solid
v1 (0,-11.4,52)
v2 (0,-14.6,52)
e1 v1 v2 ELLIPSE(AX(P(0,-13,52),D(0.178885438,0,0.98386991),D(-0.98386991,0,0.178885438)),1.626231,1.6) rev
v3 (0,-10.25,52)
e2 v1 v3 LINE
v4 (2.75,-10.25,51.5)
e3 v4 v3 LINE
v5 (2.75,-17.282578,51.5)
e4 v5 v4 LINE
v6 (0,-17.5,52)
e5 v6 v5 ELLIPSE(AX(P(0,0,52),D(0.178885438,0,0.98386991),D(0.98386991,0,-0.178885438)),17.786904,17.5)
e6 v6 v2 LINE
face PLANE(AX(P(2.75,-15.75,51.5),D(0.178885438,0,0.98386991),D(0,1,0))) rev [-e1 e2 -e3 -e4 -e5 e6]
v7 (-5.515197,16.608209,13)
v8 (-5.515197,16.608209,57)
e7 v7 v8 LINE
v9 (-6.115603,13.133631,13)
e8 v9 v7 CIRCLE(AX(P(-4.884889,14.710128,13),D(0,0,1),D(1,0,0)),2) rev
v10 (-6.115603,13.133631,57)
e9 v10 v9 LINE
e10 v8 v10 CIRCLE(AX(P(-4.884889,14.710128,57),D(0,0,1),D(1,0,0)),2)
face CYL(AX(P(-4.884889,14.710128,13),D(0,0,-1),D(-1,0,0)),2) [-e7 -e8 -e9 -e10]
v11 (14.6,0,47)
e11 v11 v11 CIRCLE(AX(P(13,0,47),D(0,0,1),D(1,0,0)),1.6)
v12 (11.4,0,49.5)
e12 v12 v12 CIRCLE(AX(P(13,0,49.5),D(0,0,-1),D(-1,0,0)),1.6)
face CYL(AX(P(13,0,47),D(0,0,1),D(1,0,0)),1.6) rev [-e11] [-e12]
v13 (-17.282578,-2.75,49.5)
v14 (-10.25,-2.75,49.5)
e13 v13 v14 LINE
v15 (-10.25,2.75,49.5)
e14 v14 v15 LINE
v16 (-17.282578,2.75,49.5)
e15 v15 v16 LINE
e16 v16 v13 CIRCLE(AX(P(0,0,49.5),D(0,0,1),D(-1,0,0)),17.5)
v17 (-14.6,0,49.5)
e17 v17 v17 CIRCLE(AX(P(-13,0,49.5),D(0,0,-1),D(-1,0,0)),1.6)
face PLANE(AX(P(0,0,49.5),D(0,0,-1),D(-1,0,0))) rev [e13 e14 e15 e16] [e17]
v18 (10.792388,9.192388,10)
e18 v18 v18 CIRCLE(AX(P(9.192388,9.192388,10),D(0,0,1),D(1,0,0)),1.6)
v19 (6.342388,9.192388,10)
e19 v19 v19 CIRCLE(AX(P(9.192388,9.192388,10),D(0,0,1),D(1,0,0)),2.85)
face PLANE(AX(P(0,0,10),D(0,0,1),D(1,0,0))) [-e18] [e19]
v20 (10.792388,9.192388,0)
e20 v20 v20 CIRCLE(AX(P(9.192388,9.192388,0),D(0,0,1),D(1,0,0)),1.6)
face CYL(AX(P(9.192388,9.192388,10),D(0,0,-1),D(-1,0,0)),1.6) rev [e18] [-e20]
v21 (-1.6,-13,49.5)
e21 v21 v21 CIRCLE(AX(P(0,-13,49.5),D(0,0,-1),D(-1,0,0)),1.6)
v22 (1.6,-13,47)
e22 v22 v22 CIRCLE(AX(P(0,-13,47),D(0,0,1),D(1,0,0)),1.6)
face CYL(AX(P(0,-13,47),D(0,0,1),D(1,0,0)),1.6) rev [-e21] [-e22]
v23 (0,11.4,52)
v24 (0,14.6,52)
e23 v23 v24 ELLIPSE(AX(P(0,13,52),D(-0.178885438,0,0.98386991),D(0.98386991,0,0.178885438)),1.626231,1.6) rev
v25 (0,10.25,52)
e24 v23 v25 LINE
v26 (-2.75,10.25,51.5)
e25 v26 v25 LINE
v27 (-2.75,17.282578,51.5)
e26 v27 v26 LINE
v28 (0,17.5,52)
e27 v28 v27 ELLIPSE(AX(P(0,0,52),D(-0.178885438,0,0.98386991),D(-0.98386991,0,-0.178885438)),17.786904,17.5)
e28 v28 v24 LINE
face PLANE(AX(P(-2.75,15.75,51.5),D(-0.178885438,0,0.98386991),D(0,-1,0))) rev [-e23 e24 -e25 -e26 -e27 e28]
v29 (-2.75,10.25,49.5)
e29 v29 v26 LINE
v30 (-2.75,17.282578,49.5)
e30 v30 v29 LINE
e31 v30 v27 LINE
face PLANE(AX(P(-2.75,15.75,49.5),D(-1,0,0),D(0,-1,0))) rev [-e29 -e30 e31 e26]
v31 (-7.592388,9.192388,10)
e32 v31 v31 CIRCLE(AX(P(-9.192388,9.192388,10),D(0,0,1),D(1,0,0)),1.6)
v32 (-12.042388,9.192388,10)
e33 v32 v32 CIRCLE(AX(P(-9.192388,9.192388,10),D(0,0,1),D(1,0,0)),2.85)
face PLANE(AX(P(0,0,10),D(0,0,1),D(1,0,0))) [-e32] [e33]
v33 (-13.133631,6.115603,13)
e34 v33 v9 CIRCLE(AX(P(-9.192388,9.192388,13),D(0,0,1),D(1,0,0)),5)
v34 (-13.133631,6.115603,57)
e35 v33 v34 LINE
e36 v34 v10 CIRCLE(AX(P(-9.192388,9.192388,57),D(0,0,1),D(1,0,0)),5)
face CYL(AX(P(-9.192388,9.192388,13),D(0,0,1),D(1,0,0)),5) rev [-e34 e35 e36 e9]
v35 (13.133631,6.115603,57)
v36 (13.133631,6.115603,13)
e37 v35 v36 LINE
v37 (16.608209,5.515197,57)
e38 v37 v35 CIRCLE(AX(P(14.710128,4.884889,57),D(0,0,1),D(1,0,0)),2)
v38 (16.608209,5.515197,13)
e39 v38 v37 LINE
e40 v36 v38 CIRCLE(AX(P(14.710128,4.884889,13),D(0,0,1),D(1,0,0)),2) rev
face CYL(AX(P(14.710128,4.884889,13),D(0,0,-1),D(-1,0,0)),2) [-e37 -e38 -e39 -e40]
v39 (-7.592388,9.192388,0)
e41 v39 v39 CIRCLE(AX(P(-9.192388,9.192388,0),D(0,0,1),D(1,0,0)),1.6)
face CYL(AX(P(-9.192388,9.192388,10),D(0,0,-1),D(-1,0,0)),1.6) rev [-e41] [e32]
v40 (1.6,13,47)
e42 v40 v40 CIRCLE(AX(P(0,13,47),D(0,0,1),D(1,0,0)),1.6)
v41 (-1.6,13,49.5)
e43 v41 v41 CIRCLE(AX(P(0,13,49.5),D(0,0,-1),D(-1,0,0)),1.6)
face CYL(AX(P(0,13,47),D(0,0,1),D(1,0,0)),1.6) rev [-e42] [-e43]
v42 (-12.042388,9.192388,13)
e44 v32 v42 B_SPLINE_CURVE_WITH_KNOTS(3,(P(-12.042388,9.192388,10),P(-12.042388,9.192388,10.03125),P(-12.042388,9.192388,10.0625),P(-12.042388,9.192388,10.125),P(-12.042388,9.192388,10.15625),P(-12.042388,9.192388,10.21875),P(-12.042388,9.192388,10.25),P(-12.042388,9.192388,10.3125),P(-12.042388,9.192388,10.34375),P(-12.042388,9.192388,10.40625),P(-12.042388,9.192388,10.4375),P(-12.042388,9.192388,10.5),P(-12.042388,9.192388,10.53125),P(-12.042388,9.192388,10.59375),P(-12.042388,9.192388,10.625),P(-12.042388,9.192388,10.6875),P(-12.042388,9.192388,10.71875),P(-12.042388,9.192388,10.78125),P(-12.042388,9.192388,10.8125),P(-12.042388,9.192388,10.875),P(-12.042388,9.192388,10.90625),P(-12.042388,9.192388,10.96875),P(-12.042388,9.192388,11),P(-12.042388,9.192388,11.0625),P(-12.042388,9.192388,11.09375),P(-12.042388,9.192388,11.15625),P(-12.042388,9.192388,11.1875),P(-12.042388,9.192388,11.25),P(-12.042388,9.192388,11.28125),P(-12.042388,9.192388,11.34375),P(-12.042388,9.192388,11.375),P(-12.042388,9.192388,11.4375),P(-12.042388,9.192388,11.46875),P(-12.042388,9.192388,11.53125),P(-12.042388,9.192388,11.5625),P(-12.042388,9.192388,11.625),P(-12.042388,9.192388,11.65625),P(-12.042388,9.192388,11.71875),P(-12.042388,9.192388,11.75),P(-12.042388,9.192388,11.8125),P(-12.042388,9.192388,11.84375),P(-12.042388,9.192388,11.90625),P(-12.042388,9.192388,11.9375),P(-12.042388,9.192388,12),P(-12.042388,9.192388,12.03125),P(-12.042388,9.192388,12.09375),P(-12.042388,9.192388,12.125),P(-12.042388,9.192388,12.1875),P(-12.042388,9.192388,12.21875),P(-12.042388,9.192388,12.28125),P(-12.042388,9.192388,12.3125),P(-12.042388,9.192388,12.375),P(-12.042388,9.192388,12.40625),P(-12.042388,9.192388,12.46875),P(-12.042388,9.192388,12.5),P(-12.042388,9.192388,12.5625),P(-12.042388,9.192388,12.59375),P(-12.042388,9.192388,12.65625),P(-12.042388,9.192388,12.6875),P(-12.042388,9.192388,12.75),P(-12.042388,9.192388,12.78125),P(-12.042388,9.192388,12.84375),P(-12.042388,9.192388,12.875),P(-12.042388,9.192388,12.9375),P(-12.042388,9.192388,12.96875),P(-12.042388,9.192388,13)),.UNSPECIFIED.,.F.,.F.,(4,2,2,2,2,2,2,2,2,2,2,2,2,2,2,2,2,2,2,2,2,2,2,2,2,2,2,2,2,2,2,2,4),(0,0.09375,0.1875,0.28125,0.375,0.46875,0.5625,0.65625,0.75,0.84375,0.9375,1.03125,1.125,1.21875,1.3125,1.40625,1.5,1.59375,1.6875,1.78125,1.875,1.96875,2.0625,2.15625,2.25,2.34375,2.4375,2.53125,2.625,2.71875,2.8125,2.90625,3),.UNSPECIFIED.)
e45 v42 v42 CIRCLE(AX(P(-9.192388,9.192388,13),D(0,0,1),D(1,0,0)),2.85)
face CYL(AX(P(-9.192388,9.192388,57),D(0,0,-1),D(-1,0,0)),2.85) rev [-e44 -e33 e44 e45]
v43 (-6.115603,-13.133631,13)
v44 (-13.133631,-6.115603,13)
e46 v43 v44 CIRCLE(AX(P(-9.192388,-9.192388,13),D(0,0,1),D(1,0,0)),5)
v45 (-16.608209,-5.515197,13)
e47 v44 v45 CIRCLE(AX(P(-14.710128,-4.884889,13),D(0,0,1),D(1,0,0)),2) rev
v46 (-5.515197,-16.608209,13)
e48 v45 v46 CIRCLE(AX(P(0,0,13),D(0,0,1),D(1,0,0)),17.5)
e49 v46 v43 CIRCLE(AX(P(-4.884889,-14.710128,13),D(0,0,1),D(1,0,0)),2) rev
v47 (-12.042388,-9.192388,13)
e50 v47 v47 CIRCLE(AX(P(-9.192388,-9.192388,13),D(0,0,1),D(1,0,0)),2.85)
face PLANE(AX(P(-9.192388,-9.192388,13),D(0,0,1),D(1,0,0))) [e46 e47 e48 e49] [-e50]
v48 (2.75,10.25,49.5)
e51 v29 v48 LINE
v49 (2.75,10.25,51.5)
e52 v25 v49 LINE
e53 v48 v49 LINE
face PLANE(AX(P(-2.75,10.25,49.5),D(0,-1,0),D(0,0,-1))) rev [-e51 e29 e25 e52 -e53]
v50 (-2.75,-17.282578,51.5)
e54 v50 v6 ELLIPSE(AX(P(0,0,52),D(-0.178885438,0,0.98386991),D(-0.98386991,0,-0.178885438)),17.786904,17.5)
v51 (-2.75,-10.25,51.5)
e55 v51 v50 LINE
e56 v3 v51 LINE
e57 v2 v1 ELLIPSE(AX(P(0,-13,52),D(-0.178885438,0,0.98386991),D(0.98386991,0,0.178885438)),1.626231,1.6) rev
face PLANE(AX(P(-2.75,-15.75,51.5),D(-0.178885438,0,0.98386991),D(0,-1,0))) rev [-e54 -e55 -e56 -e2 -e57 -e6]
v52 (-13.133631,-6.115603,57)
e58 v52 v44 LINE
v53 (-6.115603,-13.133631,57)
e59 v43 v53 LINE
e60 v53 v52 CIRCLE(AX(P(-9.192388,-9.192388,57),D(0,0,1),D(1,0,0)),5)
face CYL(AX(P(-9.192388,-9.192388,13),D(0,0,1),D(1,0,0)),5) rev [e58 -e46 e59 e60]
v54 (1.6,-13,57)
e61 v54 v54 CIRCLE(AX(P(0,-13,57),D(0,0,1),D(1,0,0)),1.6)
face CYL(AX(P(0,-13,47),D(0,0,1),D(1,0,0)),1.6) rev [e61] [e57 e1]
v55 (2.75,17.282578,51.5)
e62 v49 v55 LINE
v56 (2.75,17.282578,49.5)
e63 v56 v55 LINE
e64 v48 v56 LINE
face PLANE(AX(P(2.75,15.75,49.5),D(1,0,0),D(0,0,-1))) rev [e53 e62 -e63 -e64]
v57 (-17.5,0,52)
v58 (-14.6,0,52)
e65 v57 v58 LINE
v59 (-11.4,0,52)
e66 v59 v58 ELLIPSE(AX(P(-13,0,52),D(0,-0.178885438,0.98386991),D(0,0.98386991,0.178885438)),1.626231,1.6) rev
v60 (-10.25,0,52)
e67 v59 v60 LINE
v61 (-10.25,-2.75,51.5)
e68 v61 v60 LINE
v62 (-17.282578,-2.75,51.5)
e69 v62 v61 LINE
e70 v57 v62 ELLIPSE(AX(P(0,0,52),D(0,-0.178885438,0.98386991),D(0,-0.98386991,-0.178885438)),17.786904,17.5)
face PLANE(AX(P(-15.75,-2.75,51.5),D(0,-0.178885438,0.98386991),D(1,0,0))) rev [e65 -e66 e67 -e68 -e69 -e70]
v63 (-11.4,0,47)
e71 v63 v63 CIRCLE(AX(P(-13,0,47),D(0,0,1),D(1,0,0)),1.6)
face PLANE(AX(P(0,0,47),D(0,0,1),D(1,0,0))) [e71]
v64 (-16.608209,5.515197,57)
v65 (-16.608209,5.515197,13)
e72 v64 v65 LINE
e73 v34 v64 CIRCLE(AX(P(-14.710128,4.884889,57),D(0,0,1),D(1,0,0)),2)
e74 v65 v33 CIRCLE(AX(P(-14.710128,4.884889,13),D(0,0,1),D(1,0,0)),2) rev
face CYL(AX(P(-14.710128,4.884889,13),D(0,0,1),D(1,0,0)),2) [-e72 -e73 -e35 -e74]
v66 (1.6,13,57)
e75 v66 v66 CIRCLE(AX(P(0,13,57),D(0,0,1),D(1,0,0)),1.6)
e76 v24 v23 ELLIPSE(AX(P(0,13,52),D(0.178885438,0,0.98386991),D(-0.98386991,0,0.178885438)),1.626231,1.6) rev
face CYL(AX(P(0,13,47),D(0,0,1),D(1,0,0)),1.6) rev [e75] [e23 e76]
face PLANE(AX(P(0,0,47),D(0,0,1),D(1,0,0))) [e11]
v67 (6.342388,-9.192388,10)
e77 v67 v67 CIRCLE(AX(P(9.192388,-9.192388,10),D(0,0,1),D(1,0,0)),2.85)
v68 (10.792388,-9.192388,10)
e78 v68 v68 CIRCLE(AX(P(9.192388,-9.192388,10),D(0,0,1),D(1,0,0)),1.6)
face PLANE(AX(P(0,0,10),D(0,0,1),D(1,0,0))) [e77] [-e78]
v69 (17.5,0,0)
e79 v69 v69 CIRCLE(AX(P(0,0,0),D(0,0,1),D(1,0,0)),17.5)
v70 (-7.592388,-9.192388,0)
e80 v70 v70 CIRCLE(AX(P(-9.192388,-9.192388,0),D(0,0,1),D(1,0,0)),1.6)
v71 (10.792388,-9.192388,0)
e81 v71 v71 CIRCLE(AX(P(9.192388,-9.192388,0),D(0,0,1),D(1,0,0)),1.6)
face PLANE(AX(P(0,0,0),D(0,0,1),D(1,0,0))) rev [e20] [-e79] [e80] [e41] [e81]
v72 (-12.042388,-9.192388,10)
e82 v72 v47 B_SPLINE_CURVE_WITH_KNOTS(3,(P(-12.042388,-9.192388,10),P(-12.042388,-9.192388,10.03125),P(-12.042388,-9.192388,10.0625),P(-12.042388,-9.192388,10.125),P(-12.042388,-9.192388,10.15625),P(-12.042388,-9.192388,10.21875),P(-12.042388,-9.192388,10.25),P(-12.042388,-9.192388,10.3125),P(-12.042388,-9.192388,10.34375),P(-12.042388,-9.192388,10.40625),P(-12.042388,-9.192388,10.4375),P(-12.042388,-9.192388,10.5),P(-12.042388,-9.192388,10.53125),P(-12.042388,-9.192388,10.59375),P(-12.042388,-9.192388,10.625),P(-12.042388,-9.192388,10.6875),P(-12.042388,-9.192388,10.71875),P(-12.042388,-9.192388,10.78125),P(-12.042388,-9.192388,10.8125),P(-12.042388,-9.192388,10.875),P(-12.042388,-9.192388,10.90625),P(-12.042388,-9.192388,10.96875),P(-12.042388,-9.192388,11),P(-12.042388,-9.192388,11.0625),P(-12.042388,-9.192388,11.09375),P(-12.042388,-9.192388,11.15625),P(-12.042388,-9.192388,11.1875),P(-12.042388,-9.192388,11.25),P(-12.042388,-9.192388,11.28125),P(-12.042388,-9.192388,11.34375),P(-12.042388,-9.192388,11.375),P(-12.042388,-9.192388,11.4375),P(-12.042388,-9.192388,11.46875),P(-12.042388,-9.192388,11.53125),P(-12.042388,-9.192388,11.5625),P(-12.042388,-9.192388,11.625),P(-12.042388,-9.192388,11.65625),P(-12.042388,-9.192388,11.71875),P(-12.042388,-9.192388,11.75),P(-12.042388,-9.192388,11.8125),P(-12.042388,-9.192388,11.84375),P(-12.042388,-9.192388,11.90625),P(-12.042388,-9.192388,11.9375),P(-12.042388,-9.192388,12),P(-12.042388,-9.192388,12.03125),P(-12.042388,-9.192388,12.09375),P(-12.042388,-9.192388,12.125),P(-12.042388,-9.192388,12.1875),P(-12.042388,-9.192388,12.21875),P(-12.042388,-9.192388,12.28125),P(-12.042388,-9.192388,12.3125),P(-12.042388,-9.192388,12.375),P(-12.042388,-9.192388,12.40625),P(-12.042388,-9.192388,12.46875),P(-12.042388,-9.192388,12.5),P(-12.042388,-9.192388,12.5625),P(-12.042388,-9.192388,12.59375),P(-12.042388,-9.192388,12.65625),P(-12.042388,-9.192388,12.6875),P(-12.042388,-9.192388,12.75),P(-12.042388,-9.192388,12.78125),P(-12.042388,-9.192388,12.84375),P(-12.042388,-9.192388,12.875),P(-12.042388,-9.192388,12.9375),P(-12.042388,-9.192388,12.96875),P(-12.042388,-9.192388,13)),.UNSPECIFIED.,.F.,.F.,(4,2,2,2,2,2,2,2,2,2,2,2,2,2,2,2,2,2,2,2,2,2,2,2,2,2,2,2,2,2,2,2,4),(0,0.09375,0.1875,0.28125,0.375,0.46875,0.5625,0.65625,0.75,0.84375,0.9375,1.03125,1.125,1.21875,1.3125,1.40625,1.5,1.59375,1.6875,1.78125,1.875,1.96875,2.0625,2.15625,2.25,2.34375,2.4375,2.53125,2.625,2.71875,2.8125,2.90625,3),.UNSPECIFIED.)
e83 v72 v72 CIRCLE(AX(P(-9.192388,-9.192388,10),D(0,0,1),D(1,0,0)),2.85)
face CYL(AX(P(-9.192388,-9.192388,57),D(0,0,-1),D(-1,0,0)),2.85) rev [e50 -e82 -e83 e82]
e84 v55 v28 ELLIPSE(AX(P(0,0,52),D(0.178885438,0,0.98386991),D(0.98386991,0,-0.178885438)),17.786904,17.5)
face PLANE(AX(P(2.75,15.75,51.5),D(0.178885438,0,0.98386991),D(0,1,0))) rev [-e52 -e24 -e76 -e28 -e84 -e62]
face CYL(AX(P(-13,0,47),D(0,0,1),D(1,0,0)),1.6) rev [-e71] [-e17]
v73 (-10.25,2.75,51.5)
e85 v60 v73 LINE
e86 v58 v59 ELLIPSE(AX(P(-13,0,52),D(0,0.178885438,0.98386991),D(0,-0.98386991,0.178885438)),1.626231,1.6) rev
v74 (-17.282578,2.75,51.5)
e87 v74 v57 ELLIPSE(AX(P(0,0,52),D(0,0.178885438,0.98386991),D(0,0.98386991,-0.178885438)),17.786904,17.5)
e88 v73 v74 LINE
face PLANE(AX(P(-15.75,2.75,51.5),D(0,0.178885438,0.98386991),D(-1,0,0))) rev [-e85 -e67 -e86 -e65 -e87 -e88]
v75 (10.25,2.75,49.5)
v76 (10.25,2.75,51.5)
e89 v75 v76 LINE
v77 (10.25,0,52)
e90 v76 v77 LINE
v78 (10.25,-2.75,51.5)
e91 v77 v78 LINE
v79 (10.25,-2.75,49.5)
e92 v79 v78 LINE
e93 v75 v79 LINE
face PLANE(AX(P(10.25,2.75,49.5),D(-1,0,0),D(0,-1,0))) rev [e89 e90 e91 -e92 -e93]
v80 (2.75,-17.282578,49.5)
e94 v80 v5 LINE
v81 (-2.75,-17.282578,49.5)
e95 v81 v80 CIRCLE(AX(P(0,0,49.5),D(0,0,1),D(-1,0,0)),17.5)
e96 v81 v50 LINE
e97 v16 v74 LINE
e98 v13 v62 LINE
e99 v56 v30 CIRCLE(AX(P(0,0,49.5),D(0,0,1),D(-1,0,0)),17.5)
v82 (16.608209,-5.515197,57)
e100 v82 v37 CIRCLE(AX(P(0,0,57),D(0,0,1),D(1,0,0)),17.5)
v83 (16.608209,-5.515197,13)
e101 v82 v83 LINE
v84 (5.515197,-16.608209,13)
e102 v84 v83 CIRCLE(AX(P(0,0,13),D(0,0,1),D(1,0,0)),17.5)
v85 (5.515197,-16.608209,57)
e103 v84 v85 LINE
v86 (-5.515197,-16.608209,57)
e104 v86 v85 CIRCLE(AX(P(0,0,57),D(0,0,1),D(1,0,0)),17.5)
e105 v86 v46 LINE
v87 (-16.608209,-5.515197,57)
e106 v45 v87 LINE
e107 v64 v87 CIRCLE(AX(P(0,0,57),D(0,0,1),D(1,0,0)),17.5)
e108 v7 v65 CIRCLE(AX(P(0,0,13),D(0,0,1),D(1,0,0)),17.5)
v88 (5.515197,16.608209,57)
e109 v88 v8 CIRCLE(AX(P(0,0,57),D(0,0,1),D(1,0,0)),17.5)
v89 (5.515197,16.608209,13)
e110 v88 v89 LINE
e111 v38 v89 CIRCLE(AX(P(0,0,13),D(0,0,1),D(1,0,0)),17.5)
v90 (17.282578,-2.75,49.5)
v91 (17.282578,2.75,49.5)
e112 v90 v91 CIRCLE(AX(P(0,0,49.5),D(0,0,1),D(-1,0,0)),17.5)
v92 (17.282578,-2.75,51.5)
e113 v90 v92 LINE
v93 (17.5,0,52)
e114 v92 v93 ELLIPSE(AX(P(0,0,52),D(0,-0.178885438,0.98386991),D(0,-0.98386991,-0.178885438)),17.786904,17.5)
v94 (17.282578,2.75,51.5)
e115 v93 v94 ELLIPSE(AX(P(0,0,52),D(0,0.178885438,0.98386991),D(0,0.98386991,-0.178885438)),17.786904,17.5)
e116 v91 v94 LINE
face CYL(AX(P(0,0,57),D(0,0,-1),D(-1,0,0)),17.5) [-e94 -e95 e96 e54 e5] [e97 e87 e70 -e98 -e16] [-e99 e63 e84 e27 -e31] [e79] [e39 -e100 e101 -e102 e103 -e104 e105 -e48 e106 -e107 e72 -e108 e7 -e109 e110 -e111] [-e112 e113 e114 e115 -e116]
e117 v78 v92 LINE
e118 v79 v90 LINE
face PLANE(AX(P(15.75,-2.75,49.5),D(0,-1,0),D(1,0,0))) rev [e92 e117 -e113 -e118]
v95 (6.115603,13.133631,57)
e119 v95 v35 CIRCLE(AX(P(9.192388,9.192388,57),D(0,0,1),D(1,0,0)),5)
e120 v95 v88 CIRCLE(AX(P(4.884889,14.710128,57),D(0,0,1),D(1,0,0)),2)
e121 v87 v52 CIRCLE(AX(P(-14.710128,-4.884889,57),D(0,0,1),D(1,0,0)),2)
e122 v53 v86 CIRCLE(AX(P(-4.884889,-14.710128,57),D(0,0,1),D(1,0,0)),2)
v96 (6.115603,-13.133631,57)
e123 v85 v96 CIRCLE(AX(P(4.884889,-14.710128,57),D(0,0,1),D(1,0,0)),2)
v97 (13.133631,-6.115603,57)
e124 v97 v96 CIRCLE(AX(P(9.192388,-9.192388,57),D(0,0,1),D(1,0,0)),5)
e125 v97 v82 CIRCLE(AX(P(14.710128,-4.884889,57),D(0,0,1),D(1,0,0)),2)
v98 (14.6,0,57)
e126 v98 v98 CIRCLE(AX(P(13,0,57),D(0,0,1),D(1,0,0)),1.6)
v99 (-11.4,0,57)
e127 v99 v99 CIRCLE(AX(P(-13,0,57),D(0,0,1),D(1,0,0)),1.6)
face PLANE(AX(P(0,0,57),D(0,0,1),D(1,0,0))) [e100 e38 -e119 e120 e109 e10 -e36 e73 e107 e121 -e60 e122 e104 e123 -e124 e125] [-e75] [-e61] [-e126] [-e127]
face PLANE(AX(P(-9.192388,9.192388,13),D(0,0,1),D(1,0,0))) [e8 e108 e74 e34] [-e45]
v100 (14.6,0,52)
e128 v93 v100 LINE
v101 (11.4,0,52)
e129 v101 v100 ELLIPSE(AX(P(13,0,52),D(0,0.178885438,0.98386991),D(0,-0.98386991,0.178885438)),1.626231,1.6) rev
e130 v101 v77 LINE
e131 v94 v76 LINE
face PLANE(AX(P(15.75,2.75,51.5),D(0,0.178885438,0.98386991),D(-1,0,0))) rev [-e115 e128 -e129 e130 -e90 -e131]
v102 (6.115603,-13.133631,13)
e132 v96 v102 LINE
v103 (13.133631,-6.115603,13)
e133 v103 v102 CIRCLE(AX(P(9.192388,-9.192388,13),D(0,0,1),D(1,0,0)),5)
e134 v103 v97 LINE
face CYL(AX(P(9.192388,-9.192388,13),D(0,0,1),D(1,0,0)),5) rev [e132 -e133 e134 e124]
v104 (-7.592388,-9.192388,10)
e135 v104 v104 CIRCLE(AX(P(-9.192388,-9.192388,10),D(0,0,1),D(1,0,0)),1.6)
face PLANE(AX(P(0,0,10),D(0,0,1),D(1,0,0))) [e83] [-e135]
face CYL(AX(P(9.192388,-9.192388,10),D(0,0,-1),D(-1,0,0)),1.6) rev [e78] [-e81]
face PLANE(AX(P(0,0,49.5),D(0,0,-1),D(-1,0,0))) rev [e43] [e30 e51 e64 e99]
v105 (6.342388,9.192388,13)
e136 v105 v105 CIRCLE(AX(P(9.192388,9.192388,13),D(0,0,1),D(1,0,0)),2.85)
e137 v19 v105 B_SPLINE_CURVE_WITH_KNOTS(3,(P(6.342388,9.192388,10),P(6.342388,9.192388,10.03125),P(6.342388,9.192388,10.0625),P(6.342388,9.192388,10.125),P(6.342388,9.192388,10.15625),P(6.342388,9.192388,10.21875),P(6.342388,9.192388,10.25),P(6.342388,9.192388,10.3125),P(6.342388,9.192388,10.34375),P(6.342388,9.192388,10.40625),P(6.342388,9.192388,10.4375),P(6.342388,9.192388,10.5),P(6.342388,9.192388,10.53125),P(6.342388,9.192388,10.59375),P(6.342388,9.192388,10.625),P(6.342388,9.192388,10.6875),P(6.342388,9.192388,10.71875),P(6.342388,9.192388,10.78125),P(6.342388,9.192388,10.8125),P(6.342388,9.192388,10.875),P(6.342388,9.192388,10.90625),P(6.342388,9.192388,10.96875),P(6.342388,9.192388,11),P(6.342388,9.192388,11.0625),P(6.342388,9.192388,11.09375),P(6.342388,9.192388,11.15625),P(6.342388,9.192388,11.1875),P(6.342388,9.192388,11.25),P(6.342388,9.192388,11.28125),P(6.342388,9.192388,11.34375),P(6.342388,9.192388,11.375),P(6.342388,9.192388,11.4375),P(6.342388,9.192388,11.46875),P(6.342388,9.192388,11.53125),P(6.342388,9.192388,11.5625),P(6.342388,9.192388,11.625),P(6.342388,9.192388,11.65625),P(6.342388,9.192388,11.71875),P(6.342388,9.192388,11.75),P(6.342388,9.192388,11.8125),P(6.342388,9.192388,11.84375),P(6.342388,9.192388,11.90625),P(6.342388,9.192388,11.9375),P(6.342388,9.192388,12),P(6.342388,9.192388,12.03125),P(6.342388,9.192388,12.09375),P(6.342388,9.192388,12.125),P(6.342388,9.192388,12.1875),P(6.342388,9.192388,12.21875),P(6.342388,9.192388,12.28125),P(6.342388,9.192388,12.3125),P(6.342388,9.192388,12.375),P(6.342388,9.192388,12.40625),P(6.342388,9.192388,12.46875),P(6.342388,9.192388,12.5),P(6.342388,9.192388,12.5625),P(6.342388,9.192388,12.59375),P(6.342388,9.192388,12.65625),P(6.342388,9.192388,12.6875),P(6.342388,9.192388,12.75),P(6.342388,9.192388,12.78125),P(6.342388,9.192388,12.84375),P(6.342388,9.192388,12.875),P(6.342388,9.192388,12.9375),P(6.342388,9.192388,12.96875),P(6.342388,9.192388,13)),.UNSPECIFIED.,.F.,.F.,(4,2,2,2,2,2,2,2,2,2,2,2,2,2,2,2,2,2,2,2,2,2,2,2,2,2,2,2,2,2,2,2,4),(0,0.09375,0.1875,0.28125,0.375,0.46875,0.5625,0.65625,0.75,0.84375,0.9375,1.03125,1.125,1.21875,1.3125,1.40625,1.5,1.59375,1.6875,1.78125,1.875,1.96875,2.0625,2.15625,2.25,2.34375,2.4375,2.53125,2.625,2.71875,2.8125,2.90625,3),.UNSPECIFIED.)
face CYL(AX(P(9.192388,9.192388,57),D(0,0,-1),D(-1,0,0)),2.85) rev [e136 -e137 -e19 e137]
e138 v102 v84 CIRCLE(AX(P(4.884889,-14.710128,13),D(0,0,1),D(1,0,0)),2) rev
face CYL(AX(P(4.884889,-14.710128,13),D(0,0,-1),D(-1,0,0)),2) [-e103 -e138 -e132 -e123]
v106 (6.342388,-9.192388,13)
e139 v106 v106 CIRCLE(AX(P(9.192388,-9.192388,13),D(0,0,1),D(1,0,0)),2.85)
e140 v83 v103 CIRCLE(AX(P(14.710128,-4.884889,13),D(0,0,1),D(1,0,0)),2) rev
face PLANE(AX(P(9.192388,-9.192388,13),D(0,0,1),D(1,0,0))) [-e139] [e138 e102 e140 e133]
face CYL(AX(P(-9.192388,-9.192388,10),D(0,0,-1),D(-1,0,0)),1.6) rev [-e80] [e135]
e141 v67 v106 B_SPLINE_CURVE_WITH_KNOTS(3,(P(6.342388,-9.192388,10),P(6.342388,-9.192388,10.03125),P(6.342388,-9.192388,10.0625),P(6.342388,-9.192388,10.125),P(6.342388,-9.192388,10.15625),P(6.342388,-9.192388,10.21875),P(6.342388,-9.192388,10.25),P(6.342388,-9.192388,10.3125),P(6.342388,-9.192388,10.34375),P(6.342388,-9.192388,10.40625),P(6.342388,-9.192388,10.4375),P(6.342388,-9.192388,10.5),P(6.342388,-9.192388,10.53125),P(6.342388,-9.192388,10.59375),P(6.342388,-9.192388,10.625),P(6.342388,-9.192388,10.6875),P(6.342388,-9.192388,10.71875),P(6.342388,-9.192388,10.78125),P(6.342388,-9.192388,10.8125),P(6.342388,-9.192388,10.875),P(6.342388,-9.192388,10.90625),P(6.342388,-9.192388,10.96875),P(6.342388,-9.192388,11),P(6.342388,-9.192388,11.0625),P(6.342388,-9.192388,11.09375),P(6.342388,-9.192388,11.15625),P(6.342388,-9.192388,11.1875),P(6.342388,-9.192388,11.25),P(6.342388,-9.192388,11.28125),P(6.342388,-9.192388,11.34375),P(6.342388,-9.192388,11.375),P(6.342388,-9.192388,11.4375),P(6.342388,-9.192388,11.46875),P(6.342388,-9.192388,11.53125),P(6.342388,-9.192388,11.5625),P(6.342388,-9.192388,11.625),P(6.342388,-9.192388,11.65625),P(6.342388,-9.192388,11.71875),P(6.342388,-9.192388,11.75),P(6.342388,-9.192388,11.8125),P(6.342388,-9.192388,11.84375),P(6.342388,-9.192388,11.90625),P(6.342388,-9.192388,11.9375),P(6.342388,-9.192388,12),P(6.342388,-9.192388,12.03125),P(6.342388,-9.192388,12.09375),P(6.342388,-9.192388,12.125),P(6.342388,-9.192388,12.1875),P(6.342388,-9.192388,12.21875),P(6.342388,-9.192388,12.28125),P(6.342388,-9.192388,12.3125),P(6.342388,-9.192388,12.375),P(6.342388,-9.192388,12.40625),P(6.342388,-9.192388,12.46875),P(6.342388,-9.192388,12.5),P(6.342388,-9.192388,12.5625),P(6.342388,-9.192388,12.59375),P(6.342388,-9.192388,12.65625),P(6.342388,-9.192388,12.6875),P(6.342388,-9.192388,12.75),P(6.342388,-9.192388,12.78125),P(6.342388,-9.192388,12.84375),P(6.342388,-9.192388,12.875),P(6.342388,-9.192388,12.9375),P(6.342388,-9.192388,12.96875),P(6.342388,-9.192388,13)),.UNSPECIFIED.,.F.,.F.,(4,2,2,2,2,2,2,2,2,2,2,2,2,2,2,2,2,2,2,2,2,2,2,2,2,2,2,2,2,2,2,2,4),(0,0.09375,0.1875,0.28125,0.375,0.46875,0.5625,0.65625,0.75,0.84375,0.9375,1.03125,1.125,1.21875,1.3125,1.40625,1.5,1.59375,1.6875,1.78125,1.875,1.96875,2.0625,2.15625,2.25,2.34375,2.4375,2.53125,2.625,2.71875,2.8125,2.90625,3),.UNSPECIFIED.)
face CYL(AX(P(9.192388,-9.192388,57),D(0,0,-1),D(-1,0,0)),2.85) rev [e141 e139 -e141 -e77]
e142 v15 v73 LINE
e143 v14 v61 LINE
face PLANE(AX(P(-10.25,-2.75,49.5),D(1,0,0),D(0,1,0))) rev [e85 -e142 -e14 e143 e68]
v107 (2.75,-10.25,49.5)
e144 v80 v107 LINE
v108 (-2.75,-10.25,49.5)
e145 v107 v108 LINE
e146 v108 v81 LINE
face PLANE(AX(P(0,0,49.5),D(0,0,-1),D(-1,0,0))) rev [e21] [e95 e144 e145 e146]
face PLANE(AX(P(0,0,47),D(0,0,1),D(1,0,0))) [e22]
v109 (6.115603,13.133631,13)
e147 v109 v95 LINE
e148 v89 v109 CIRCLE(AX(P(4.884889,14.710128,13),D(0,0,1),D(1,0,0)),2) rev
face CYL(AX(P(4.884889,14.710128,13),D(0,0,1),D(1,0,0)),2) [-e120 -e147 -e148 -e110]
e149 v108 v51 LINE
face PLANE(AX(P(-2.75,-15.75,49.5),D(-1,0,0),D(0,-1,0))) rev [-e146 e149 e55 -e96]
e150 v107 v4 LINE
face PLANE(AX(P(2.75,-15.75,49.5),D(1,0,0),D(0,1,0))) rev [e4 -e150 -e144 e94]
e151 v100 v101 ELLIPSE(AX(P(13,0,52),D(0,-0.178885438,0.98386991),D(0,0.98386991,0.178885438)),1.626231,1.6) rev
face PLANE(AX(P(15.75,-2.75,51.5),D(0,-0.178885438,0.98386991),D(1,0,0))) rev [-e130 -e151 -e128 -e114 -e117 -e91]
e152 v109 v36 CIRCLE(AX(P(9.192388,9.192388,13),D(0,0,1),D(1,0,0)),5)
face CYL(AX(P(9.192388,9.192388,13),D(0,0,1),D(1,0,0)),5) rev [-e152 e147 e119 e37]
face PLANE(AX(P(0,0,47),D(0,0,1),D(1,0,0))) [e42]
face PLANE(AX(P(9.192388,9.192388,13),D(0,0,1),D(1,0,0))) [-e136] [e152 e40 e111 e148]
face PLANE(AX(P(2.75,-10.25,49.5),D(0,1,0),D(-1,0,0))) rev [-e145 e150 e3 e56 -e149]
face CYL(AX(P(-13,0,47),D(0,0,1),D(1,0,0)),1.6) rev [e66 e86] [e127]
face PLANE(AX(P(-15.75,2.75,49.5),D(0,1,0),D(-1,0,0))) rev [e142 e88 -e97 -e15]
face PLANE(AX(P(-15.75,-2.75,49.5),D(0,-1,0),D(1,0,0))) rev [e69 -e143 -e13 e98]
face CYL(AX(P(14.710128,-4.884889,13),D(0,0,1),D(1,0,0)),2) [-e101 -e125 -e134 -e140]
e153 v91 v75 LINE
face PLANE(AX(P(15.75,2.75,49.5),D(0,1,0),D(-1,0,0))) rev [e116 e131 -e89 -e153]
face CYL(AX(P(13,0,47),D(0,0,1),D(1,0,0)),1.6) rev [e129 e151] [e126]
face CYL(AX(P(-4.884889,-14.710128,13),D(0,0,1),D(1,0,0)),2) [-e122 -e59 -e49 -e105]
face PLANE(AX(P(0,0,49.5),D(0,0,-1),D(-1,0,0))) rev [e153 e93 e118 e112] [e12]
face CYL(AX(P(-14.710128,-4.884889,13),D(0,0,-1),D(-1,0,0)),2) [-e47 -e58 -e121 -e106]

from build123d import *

# Parameters (mm, degrees)
SKETCH1_R           = 17.5
SKETCH1_R_2         = 2.85
BOSS_EXTRUDE1_DEPTH = 57
SKETCH1_3_R         = 2.85
SKETCH1_3_R_2       = 1.6
BOSS_EXTRUDE2_DEPTH = 10
SKETCH2_R           = 5
CUT_EXTRUDE1_DEPTH  = 44
FILLET1_R           = 2
CUT_EXTRUDE2_START  = -7.5
SKETCH3_R           = 1.6
CUT_EXTRUDE2_DEPTH  = 2.5
CUT_EXTRUDE3_START  = -10
SKETCH3_2_R         = 1.6
CUT_EXTRUDE3_DEPTH  = 10
CHAMFER1_SIZE       = 2.75
CHAMFER1_SIZE_2     = 0.5


with BuildPart() as part:
    # Sketch1 → Boss-Extrude1 (new body)
    with BuildSketch(Plane(origin=(0, 0, 0), x_dir=(0, 1, 0), z_dir=(0, 0, 1))):
        with Locations(Location((0, 0, 0), (0, 0, 90))):
            Circle(SKETCH1_R)
        with Locations(Location((-9.192388155, 9.192388155, 0), (0, 0, 90))):
            Circle(SKETCH1_R_2, mode=Mode.SUBTRACT)
        with Locations(Location((-9.192388155, -9.192388155, 0), (0, 0, 90))):
            Circle(SKETCH1_R_2, mode=Mode.SUBTRACT)
        with Locations(Location((9.192388155, -9.192388155, 0), (0, 0, 90))):
            Circle(SKETCH1_R_2, mode=Mode.SUBTRACT)
        with Locations(Location((9.192388155, 9.192388155, 0), (0, 0, 90))):
            Circle(SKETCH1_R_2, mode=Mode.SUBTRACT)
    extrude(amount=BOSS_EXTRUDE1_DEPTH)

    # Sketch1<3> → Boss-Extrude2 (add)
    # profile 1 of 4: a face of its own
    with BuildSketch(Plane(origin=(0, 0, 0), x_dir=(0, 1, 0), z_dir=(0, 0, 1))):
        with Locations(Location((-9.192388155, -9.192388155, 0), (0, 0, 90))):
            Circle(SKETCH1_3_R)
        with Locations(Location((-9.192388155, -9.192388155, 0), (0, 0, 270))):
            Circle(SKETCH1_3_R_2, mode=Mode.SUBTRACT)
    # profile 2 of 4: a face of its own
    with BuildSketch(Plane(origin=(0, 0, 0), x_dir=(0, 1, 0), z_dir=(0, 0, 1))):
        with Locations(Location((-9.192388155, 9.192388155, 0), (0, 0, 90))):
            Circle(SKETCH1_3_R)
        with Locations(Location((-9.192388155, 9.192388155, 0), (0, 0, 270))):
            Circle(SKETCH1_3_R_2, mode=Mode.SUBTRACT)
    # profile 3 of 4: a face of its own
    with BuildSketch(Plane(origin=(0, 0, 0), x_dir=(0, 1, 0), z_dir=(0, 0, 1))):
        with Locations(Location((9.192388155, -9.192388155, 0), (0, 0, 90))):
            Circle(SKETCH1_3_R)
        with Locations(Location((9.192388155, -9.192388155, 0), (0, 0, 270))):
            Circle(SKETCH1_3_R_2, mode=Mode.SUBTRACT)
    # profile 4 of 4: a face of its own
    with BuildSketch(Plane(origin=(0, 0, 0), x_dir=(0, 1, 0), z_dir=(0, 0, 1))):
        with Locations(Location((9.192388155, 9.192388155, 0), (0, 0, 90))):
            Circle(SKETCH1_3_R)
        with Locations(Location((9.192388155, 9.192388155, 0), (0, 0, 270))):
            Circle(SKETCH1_3_R_2, mode=Mode.SUBTRACT)
    extrude(amount=BOSS_EXTRUDE2_DEPTH)

    # Sketch2 → Cut-Extrude1 (cut)
    with BuildSketch(Plane.XY.offset(57)):
        with Locations((-9.192388155, 9.192388155)):
            Circle(SKETCH2_R)
        with Locations((9.192388155, 9.192388155)):
            Circle(SKETCH2_R)
        with Locations((9.192388155, -9.192388155)):
            Circle(SKETCH2_R)
        with Locations((-9.192388155, -9.192388155)):
            Circle(SKETCH2_R)
    extrude(amount=-CUT_EXTRUDE1_DEPTH, mode=Mode.SUBTRACT)

    # Fillet1
    fillet1_edges = [part.edges().sort_by_distance(p)[0] for p in [
        (-14.028560913, -10.46181049, 35),
        (-10.46181049, -14.028560913, 35),
        (10.46181049, -14.028560913, 35),
        (14.028560913, -10.46181049, 35),
        (14.028560913, 10.46181049, 35),
        (10.46181049, 14.028560913, 35),
        (-10.46181049, 14.028560913, 35),
        (-14.028560913, 10.46181049, 35),
    ]]
    fillet(fillet1_edges, radius=FILLET1_R)

    # Sketch3 → Cut-Extrude2 (cut)
    # profile 1 of 4: a face of its own
    with BuildSketch(Plane.XY.offset(57).offset(CUT_EXTRUDE2_START)):
        with BuildLine():
            Line((-2.75, 15.75), (-2.75, 17.282577933))
            ThreePointArc((-2.75, 17.282577933), (0, 17.5), (2.75, 17.282577933))
            Line((2.75, 17.282577933), (2.75, 15.75))
            Line((2.75, 15.75), (2.75, 10.25))
            Line((2.75, 10.25), (-2.75, 10.25))
            Line((-2.75, 10.25), (-2.75, 15.75))
        make_face()
        with Locations((0, 13)):
            Circle(SKETCH3_R, mode=Mode.SUBTRACT)
    # profile 2 of 4: a face of its own
    with BuildSketch(Plane.XY.offset(57).offset(CUT_EXTRUDE2_START)):
        with BuildLine():
            Line((15.75, -2.75), (10.25, -2.75))
            Line((10.25, -2.75), (10.25, 2.75))
            Line((10.25, 2.75), (15.75, 2.75))
            Line((15.75, 2.75), (17.282577933, 2.75))
            ThreePointArc((17.282577933, 2.75), (17.5, 0), (17.282577933, -2.75))
            Line((17.282577933, -2.75), (15.75, -2.75))
        make_face()
        with Locations((13, 0)):
            Circle(SKETCH3_R, mode=Mode.SUBTRACT)
    # profile 3 of 4: a face of its own
    with BuildSketch(Plane.XY.offset(57).offset(CUT_EXTRUDE2_START)):
        with BuildLine():
            Line((-2.75, -15.75), (-2.75, -10.25))
            Line((-2.75, -10.25), (2.75, -10.25))
            Line((2.75, -10.25), (2.75, -15.75))
            Line((2.75, -15.75), (2.75, -17.282577933))
            ThreePointArc((2.75, -17.282577933), (0, -17.5), (-2.75, -17.282577933))
            Line((-2.75, -17.282577933), (-2.75, -15.75))
        make_face()
        with Locations((0, -13)):
            Circle(SKETCH3_R, mode=Mode.SUBTRACT)
    # profile 4 of 4: a face of its own
    with BuildSketch(Plane.XY.offset(57).offset(CUT_EXTRUDE2_START)):
        with BuildLine():
            Line((-15.75, 2.75), (-10.25, 2.75))
            Line((-10.25, 2.75), (-10.25, -2.75))
            Line((-10.25, -2.75), (-15.75, -2.75))
            Line((-15.75, -2.75), (-17.282577933, -2.75))
            ThreePointArc((-17.282577933, -2.75), (-17.5, 0), (-17.282577933, 2.75))
            Line((-17.282577933, 2.75), (-15.75, 2.75))
        make_face()
        with Locations((-13, 0)):
            Circle(SKETCH3_R, mode=Mode.SUBTRACT)
    extrude(amount=CUT_EXTRUDE2_DEPTH, mode=Mode.SUBTRACT)

    # Sketch3<2> → Cut-Extrude3 (cut)
    with BuildSketch(Plane.XY.offset(57).offset(CUT_EXTRUDE3_START)):
        with Locations((-13, 0)):
            Circle(SKETCH3_2_R)
        with Locations((0, 13)):
            Circle(SKETCH3_2_R)
        with Locations((13, 0)):
            Circle(SKETCH3_2_R)
        with Locations((0, -13)):
            Circle(SKETCH3_2_R)
    extrude(amount=CUT_EXTRUDE3_DEPTH, mode=Mode.SUBTRACT)

    # Chamfer1
    # the kernel refuses this chamfer: 2.75, 0.5 mm, written as the material it adds along each edge
    with BuildSketch(Plane(origin=(-3.104266441, -2.75, 52), x_dir=(1.0355932807417332e-14, 0.9999763028084744, 0.006884317068104265), z_dir=(-1, 0, 0))) as chamfer1_piece_1_section:
        Polygon((CHAMFER1_SIZE * 0.999976302808, CHAMFER1_SIZE * 0.0068843170681), (-CHAMFER1_SIZE_2 * 0.0068843170681, CHAMFER1_SIZE_2 * 0.999976302808), (0, 0), align=None)
    chamfer1_piece_1 = extrude(amount=21.324045051, mode=Mode.PRIVATE)
    chamfer1_piece_1 = chamfer1_piece_1 & Plane(origin=(0, 0, 51.863927103), x_dir=(-1, 0, 0), z_dir=(0, 0, -1)) * Cylinder(17.5, 54, mode=Mode.PRIVATE)
    chamfer1_piece_1 = chamfer1_piece_1 - Plane(origin=(-13, 0, 51.863927103), x_dir=(1, 0, 0), z_dir=(0, 0, -1)) * Cylinder(1.6, 54, mode=Mode.PRIVATE)
    add(chamfer1_piece_1)
    with BuildSketch(Plane(origin=(-24.428311492, 2.75, 52), x_dir=(-1.048222467092242e-14, -0.9999763028084744, 0.006884317068104265), z_dir=(1, 0, 0))) as chamfer1_piece_2_section:
        Polygon((CHAMFER1_SIZE * 0.999976302808, CHAMFER1_SIZE * 0.0068843170681), (-CHAMFER1_SIZE_2 * 0.0068843170681, CHAMFER1_SIZE_2 * 0.999976302808), (0, 0), align=None)
    chamfer1_piece_2 = extrude(amount=21.324045051, mode=Mode.PRIVATE)
    chamfer1_piece_2 = chamfer1_piece_2 & Plane(origin=(0, 0, 51.852070579), x_dir=(-1, 0, 0), z_dir=(0, 0, -1)) * Cylinder(17.5, 54, mode=Mode.PRIVATE)
    chamfer1_piece_2 = chamfer1_piece_2 - Plane(origin=(-13, 0, 51.852070579), x_dir=(1, 0, 0), z_dir=(0, 0, -1)) * Cylinder(1.6, 54, mode=Mode.PRIVATE)
    add(chamfer1_piece_2)
    with BuildSketch(Plane(origin=(-2.75, 3.104266441, 52), x_dir=(0.9999763028084744, 0, 0.006884317068104265), z_dir=(0, 1, 0))) as chamfer1_piece_3_section:
        Polygon((CHAMFER1_SIZE * 0.999976302808, CHAMFER1_SIZE * 0.0068843170681), (-CHAMFER1_SIZE_2 * 0.0068843170681, CHAMFER1_SIZE_2 * 0.999976302808), (0, 0), align=None)
    chamfer1_piece_3 = extrude(amount=21.324045051, mode=Mode.PRIVATE)
    chamfer1_piece_3 = chamfer1_piece_3 & Plane(origin=(0, 0, 51.863927103), x_dir=(-1, 0, 0), z_dir=(0, 0, -1)) * Cylinder(17.5, 54, mode=Mode.PRIVATE)
    chamfer1_piece_3 = chamfer1_piece_3 - Plane(origin=(0, 13, 51.863927103), x_dir=(1, 0, 0), z_dir=(0, 0, -1)) * Cylinder(1.6, 54, mode=Mode.PRIVATE)
    add(chamfer1_piece_3)
    with BuildSketch(Plane(origin=(2.75, 24.428311492, 52), x_dir=(0.20388124945923355, 0, -0.9789956262001082), z_dir=(0, -1, 0))) as chamfer1_piece_4_section:
        Polygon((CHAMFER1_SIZE_2 * 0.9789956262, -CHAMFER1_SIZE_2 * 0.203881249459), (-CHAMFER1_SIZE * 0.203881249459, -CHAMFER1_SIZE * 0.9789956262), (0, 0), align=None)
    chamfer1_piece_4 = extrude(amount=21.324045051, mode=Mode.PRIVATE)
    chamfer1_piece_4 = chamfer1_piece_4 & Plane(origin=(0, 0, 51.852070749), x_dir=(-1, 0, 0), z_dir=(0, 0, -1)) * Cylinder(17.5, 54, mode=Mode.PRIVATE)
    chamfer1_piece_4 = chamfer1_piece_4 - Plane(origin=(0, 13, 51.852070749), x_dir=(1, 0, 0), z_dir=(0, 0, -1)) * Cylinder(1.6, 54, mode=Mode.PRIVATE)
    add(chamfer1_piece_4)
    with BuildSketch(Plane(origin=(3.104266441, 2.75, 52), x_dir=(-3.409880314637416e-15, -0.9999763028084744, 0.006884317068104265), z_dir=(1, 0, 0))) as chamfer1_piece_5_section:
        Polygon((CHAMFER1_SIZE * 0.999976302808, CHAMFER1_SIZE * 0.0068843170681), (-CHAMFER1_SIZE_2 * 0.0068843170681, CHAMFER1_SIZE_2 * 0.999976302808), (0, 0), align=None)
    chamfer1_piece_5 = extrude(amount=21.324045051, mode=Mode.PRIVATE)
    chamfer1_piece_5 = chamfer1_piece_5 & Plane(origin=(0, 0, 51.863927103), x_dir=(-1, 0, 0), z_dir=(0, 0, -1)) * Cylinder(17.5, 54, mode=Mode.PRIVATE)
    chamfer1_piece_5 = chamfer1_piece_5 - Plane(origin=(13, 0, 51.863927103), x_dir=(1, 0, 0), z_dir=(0, 0, -1)) * Cylinder(1.6, 54, mode=Mode.PRIVATE)
    add(chamfer1_piece_5)
    with BuildSketch(Plane(origin=(24.428311492, -2.75, 52), x_dir=(0, -0.20388124945923355, -0.9789956262001082), z_dir=(-1, 0, 0))) as chamfer1_piece_6_section:
        Polygon((CHAMFER1_SIZE_2 * 0.9789956262, -CHAMFER1_SIZE_2 * 0.203881249459), (-CHAMFER1_SIZE * 0.203881249459, -CHAMFER1_SIZE * 0.9789956262), (0, 0), align=None)
    chamfer1_piece_6 = extrude(amount=21.324045051, mode=Mode.PRIVATE)
    chamfer1_piece_6 = chamfer1_piece_6 & Plane(origin=(0, 0, 51.852070888), x_dir=(-1, 0, 0), z_dir=(0, 0, -1)) * Cylinder(17.5, 54, mode=Mode.PRIVATE)
    chamfer1_piece_6 = chamfer1_piece_6 - Plane(origin=(13, 0, 51.852070888), x_dir=(1, 0, 0), z_dir=(0, 0, -1)) * Cylinder(1.6, 54, mode=Mode.PRIVATE)
    add(chamfer1_piece_6)
    with BuildSketch(Plane(origin=(2.75, -3.104266441, 52), x_dir=(-0.9999763028084744, 6.88290656102737e-15, 0.006884317068104265), z_dir=(0, -1, 0))) as chamfer1_piece_7_section:
        Polygon((CHAMFER1_SIZE * 0.999976302808, CHAMFER1_SIZE * 0.0068843170681), (-CHAMFER1_SIZE_2 * 0.0068843170681, CHAMFER1_SIZE_2 * 0.999976302808), (0, 0), align=None)
    chamfer1_piece_7 = extrude(amount=21.324045051, mode=Mode.PRIVATE)
    chamfer1_piece_7 = chamfer1_piece_7 & Plane(origin=(0, 0, 51.863927103), x_dir=(-1, 0, 0), z_dir=(0, 0, -1)) * Cylinder(17.5, 54, mode=Mode.PRIVATE)
    chamfer1_piece_7 = chamfer1_piece_7 - Plane(origin=(0, -13, 51.863927103), x_dir=(1, 0, 0), z_dir=(0, 0, -1)) * Cylinder(1.6, 54, mode=Mode.PRIVATE)
    add(chamfer1_piece_7)
    with BuildSketch(Plane(origin=(-2.75, -24.428311492, 52), x_dir=(-0.20388124945923355, 1.4290779976363847e-15, -0.9789956262001082), z_dir=(0, 1, 0))) as chamfer1_piece_8_section:
        Polygon((CHAMFER1_SIZE_2 * 0.9789956262, -CHAMFER1_SIZE_2 * 0.203881249459), (-CHAMFER1_SIZE * 0.203881249459, -CHAMFER1_SIZE * 0.9789956262), (0, 0), align=None)
    chamfer1_piece_8 = extrude(amount=21.324045051, mode=Mode.PRIVATE)
    chamfer1_piece_8 = chamfer1_piece_8 & Plane(origin=(0, 0, 51.852070422), x_dir=(-1, 0, 0), z_dir=(0, 0, -1)) * Cylinder(17.5, 54, mode=Mode.PRIVATE)
    chamfer1_piece_8 = chamfer1_piece_8 - Plane(origin=(0, -13, 51.852070422), x_dir=(1, 0, 0), z_dir=(0, 0, -1)) * Cylinder(1.6, 54, mode=Mode.PRIVATE)
    add(chamfer1_piece_8)


solid = part.part
